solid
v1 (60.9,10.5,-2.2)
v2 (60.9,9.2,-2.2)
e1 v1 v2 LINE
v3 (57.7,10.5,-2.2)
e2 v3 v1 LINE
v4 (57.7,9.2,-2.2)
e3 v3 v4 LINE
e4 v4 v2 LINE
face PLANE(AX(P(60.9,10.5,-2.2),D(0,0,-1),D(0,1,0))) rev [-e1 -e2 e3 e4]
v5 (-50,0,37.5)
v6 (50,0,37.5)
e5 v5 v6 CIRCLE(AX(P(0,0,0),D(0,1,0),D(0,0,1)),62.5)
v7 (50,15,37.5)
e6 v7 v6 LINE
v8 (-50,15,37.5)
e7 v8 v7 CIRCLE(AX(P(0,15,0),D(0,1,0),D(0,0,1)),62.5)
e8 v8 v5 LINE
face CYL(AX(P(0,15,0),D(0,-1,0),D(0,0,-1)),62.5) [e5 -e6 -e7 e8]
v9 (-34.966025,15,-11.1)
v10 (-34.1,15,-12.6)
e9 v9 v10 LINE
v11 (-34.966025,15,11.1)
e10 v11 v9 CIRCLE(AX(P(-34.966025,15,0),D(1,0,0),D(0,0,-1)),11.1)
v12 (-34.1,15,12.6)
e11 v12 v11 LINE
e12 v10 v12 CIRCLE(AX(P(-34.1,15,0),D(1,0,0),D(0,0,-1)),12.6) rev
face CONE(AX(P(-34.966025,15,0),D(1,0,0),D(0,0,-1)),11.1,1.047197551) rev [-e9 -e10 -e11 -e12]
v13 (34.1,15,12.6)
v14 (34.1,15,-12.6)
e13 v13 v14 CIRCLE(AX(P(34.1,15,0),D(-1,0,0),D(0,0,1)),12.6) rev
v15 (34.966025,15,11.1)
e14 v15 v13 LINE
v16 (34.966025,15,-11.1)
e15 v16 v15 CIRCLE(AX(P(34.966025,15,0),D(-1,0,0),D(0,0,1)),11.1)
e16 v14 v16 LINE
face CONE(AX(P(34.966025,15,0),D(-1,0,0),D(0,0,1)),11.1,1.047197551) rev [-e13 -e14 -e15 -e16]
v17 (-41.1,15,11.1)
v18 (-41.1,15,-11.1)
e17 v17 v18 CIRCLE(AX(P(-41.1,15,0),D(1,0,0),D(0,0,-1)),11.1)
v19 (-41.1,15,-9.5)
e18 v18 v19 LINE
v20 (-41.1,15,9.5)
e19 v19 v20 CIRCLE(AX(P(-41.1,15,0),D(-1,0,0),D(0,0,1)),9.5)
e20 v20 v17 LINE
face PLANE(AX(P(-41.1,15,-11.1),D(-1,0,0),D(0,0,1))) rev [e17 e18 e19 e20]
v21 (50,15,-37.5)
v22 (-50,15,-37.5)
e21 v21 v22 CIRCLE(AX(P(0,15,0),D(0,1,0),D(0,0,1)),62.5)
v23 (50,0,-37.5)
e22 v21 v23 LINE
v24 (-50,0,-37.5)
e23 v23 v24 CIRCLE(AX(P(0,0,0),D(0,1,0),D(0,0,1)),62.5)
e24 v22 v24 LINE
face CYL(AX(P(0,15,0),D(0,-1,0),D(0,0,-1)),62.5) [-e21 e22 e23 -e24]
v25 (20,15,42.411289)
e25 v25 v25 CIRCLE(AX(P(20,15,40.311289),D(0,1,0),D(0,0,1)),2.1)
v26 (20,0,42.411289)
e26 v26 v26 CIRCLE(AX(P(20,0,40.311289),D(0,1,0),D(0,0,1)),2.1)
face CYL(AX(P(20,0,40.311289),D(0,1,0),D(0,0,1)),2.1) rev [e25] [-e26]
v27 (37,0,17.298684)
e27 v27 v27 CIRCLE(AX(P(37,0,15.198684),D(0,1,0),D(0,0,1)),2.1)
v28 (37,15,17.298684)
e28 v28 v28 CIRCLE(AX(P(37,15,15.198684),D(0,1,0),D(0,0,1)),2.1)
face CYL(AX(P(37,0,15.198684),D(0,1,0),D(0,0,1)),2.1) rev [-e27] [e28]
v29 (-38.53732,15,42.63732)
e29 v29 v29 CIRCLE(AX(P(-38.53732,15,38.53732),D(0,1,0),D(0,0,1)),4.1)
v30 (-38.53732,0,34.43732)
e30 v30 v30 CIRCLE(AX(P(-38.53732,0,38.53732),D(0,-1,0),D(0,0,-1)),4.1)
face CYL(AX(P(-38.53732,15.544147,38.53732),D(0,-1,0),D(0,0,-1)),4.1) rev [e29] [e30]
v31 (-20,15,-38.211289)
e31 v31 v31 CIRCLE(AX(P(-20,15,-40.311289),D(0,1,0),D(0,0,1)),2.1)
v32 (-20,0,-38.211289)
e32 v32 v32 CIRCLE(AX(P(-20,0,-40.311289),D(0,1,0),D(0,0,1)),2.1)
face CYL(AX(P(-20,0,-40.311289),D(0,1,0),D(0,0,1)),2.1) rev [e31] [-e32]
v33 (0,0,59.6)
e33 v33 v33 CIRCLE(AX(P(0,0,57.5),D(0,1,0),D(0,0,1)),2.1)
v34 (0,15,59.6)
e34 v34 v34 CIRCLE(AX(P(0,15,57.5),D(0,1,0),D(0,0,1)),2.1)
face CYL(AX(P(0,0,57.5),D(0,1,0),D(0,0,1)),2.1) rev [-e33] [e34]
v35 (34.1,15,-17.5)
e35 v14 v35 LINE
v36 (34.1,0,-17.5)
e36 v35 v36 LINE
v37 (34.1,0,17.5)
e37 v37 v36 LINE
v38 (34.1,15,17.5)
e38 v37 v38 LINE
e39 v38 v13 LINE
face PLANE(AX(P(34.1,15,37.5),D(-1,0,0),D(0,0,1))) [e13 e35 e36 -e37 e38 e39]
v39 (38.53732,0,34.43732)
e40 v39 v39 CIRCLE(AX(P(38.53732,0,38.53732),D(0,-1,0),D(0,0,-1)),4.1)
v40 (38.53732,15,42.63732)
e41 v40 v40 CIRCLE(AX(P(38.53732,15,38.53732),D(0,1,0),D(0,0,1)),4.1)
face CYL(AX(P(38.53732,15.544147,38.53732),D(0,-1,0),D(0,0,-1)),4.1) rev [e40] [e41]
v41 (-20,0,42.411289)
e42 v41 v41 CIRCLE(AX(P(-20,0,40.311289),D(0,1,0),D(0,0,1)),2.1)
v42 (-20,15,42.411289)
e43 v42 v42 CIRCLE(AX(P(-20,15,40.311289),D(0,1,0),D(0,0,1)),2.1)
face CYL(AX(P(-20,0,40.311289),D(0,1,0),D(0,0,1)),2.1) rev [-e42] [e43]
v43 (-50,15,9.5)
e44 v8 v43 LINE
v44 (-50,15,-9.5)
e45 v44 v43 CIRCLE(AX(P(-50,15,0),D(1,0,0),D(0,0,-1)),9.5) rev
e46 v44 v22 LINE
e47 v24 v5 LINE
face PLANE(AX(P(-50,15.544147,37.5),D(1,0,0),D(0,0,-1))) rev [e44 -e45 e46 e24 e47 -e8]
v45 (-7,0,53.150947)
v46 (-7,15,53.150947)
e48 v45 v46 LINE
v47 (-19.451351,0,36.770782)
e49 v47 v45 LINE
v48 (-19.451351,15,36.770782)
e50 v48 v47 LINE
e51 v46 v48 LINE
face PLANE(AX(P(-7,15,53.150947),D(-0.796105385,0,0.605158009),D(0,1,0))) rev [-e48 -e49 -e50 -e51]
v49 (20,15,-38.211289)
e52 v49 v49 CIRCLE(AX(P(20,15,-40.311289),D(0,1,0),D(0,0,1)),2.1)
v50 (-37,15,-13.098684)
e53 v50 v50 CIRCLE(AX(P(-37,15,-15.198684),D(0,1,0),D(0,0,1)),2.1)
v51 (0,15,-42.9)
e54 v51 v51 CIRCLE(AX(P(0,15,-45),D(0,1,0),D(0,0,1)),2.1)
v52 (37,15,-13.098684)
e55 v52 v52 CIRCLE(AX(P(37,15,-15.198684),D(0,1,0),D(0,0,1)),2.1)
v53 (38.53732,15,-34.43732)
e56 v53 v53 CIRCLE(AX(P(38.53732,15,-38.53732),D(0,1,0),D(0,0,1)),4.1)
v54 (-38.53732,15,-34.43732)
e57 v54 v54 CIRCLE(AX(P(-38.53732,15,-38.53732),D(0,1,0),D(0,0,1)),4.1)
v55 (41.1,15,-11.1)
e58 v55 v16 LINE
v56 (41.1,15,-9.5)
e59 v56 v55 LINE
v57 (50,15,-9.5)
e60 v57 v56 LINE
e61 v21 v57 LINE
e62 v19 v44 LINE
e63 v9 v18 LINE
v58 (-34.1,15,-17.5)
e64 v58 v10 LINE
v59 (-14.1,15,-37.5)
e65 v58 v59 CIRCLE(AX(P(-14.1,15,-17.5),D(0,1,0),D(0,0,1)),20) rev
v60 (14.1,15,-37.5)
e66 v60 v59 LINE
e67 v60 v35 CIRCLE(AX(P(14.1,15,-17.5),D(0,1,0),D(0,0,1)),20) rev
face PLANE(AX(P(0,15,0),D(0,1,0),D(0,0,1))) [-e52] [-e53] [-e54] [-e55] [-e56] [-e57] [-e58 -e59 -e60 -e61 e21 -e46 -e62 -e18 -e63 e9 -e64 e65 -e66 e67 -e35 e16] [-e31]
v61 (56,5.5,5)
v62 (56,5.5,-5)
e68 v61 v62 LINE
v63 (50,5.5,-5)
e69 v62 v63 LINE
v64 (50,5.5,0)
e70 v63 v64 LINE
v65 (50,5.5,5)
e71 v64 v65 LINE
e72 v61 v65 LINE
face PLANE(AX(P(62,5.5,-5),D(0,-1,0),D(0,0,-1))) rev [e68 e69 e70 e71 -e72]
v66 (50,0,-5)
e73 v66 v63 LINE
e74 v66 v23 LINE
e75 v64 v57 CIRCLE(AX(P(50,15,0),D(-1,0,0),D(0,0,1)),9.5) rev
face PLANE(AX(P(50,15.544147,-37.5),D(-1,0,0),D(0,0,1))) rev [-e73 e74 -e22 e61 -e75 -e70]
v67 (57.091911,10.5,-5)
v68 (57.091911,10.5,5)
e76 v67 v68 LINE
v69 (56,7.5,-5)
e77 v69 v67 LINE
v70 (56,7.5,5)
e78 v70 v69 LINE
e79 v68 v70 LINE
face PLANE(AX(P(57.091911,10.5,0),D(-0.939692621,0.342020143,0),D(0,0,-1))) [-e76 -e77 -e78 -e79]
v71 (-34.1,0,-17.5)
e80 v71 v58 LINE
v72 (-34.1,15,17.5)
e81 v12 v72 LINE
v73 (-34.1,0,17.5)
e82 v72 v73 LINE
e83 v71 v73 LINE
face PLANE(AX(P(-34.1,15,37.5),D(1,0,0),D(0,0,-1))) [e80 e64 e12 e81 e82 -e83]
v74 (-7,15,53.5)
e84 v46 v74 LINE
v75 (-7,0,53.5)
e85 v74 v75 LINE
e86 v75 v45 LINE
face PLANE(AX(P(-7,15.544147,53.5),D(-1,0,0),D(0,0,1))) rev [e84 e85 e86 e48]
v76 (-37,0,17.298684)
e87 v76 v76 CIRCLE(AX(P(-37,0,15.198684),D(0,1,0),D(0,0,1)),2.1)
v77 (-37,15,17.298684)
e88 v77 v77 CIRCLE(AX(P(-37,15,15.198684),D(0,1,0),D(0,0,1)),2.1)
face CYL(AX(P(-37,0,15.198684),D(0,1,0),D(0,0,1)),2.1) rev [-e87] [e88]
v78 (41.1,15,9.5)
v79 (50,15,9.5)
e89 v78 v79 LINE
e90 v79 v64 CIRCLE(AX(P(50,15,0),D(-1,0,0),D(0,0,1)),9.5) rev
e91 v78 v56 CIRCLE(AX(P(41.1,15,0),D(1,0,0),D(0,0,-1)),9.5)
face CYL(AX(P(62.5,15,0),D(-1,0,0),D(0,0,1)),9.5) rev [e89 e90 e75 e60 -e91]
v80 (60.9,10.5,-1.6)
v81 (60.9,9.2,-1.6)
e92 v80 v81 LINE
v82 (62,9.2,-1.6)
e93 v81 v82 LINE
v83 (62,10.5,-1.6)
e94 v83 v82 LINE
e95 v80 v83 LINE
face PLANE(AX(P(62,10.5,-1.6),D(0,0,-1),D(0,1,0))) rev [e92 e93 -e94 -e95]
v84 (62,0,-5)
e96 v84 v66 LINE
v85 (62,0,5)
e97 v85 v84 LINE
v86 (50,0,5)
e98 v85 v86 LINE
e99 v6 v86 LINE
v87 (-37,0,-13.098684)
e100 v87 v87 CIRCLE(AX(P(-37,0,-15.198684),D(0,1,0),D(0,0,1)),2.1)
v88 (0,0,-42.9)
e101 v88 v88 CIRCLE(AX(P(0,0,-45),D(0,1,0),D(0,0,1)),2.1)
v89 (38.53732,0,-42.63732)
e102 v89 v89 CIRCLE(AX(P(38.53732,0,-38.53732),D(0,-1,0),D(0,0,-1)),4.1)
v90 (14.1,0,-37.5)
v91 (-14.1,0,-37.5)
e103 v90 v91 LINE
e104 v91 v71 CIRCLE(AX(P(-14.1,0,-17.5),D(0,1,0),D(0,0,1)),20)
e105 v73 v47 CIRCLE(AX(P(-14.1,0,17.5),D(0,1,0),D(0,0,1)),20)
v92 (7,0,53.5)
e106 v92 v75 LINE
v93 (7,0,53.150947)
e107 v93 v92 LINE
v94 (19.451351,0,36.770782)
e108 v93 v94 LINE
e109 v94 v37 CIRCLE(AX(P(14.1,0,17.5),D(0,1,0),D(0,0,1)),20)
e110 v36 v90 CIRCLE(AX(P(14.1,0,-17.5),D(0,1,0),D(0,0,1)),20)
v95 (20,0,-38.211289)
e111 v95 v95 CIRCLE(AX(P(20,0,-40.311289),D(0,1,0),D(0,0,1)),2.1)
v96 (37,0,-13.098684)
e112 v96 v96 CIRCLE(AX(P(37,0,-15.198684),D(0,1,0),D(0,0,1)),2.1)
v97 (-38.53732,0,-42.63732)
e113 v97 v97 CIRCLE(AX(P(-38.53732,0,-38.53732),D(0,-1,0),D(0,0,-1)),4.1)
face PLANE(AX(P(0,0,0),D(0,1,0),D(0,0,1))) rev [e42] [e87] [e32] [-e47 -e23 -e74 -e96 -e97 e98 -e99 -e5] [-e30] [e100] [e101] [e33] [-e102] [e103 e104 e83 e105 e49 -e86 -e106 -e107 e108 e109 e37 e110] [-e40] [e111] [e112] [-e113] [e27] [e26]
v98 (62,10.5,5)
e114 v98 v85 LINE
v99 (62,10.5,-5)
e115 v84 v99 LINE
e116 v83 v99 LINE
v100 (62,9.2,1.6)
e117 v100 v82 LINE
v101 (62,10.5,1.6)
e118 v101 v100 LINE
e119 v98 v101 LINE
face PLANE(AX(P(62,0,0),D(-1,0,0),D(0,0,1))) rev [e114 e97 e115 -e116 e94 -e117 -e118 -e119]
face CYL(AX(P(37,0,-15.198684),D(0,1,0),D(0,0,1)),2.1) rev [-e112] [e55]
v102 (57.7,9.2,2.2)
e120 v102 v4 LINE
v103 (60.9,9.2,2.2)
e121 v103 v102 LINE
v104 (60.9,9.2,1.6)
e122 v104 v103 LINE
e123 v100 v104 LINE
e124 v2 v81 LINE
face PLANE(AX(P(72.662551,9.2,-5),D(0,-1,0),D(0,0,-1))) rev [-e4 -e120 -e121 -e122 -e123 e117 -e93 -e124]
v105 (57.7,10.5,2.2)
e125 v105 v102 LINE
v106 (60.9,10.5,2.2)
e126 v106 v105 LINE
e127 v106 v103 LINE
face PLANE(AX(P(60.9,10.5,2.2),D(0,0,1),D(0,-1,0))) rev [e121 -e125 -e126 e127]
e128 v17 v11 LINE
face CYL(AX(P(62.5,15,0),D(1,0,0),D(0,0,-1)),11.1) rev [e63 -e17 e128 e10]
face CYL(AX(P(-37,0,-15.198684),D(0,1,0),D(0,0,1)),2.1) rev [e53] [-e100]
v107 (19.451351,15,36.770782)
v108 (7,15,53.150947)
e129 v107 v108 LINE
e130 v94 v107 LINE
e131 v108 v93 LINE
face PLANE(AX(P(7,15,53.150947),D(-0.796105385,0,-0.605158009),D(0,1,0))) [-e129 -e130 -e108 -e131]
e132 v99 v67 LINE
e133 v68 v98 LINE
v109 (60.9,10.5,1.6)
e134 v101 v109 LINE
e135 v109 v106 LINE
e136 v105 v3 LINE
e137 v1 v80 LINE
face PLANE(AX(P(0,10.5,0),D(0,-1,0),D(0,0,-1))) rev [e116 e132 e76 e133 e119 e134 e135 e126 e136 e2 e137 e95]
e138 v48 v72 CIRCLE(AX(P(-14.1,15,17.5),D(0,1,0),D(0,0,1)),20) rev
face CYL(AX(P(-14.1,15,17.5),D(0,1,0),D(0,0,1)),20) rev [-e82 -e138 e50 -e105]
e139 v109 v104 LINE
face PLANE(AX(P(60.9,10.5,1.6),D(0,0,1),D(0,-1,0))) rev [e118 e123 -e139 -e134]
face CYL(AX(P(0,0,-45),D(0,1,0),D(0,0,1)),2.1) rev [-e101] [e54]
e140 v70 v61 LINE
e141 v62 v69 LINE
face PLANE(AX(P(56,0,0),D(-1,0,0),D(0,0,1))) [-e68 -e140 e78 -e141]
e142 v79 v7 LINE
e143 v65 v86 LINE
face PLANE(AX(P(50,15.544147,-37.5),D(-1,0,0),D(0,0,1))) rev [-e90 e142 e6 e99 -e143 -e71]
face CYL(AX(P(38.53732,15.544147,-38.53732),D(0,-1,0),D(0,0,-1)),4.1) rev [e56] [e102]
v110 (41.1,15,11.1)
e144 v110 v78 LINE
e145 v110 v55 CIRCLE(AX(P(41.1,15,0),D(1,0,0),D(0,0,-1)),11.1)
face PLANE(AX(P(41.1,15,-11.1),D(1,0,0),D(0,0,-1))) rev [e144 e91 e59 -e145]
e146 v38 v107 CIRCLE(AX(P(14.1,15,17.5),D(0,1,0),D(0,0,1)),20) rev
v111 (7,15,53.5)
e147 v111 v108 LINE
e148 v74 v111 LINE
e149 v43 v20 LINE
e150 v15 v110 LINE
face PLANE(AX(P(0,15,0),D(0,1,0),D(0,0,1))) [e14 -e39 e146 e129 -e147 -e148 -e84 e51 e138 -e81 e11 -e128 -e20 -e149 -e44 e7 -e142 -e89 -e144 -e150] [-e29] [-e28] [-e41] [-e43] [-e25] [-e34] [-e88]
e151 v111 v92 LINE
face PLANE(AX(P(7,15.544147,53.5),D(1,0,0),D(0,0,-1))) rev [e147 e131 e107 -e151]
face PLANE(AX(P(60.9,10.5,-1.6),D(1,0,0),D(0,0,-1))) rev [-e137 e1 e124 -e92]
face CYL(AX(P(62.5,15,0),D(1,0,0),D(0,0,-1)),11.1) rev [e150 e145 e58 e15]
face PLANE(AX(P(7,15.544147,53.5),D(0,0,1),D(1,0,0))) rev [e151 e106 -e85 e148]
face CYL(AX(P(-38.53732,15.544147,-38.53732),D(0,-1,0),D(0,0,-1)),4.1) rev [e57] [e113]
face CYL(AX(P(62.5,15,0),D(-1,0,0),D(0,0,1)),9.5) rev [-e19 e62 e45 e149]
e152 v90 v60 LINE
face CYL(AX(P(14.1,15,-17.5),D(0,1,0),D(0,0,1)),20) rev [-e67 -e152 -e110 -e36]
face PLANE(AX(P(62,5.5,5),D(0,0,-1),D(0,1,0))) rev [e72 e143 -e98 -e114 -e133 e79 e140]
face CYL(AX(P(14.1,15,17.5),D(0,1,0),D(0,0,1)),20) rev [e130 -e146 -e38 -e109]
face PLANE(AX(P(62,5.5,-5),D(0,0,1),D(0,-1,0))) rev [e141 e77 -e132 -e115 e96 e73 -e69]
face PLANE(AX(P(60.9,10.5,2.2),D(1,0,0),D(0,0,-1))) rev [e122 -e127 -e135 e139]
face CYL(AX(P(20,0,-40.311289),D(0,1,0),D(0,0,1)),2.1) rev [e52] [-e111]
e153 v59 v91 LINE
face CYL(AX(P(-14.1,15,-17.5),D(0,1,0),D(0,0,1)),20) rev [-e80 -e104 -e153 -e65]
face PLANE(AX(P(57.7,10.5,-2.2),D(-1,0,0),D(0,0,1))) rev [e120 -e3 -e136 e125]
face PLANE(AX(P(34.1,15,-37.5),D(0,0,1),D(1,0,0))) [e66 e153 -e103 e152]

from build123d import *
from OCP.BRepFilletAPI import BRepFilletAPI_MakeChamfer

# Parameters (mm, degrees)
SKETCH2_R               = 62.5
SKETCH2_W               = 68.2
SKETCH2_H               = 75
BOSS_EXTRUDE1_DEPTH     = 15
SKETCH7_W               = 7
SKETCH7_H               = 11.1
CUT_EXTRUDE1_DEPTH      = 122.918866465
CUT_EXTRUDE1_DEPTH_BACK = 122.918866465
SKETCH8_R               = 9.5
FILLET1_R               = 20
SKETCH9_R               = 2.1
CUT_EXTRUDE2_DEPTH      = 90.652105542
CHAMFER1_SIZE           = 1.5
CHAMFER1_SIZE2          = 0.866025404
SKETCH10_R              = 4.1
CUT_EXTRUDE3_DEPTH      = 90.652105542
CUT_EXTRUDE4_DEPTH      = 90.652105542
SKETCH12_W              = 10
SKETCH12_H              = 5.5
BOSS_EXTRUDE2_DEPTH     = 12
BOSS_EXTRUDE3_START     = 6
SKETCH14_W              = 10
SKETCH14_H              = 3.7
BOSS_EXTRUDE3_DEPTH     = 6
BOSS_EXTRUDE4_DEPTH     = 1.3
CHAMFER2_SIZE           = 3
CHAMFER2_SIZE2          = 1.091910703
SKETCH16_W              = 14
SKETCH16_H              = 16
CUT_EXTRUDE5_DEPTH      = 90.652105542
CHAMFER3_DEPTH          = 15
CUT_EXTRUDE6_DEPTH      = 90.652105542


with BuildPart() as part:
    # Sketch2 → Boss-Extrude1 (new body)
    with BuildSketch(Plane(origin=(0, 0, 0), x_dir=(1, 0, 0), z_dir=(0, 1, 0))):
        with Locations(Location((0, 0, 0), (0, 0, 270))):
            Circle(SKETCH2_R)
        Rectangle(SKETCH2_W, SKETCH2_H, mode=Mode.SUBTRACT)
    extrude(amount=BOSS_EXTRUDE1_DEPTH)

    # Sketch7 → Cut-Revolve2 (revolve, cut)
    with BuildSketch(Plane(origin=(0, 15, 0), x_dir=(1, 0, 0), z_dir=(0, 1, 0))):
        with Locations((-37.6, 5.55)):
            Rectangle(SKETCH7_W, SKETCH7_H)
        with Locations((37.6, 5.55)):
            Rectangle(SKETCH7_W, SKETCH7_H)
    revolve(axis=Axis((62.5, 15, 0), (-1, 0, 0)), mode=Mode.SUBTRACT)

    # Sketch8 → Cut-Extrude1 (cut, two sides: drawn at the far end of the back side and taken through both)
    with BuildSketch(Plane.ZY.offset(-41.1).offset(-CUT_EXTRUDE1_DEPTH_BACK)):
        with Locations((0, 15)):
            Circle(SKETCH8_R)
    extrude(amount=CUT_EXTRUDE1_DEPTH + CUT_EXTRUDE1_DEPTH_BACK, mode=Mode.SUBTRACT)

    # Fillet1
    fillet1_edges = [part.edges().sort_by_distance(p)[0] for p in [
        (-34.1, 7.5, -37.5),
        (-34.1, 7.5, 37.5),
        (34.1, 7.5, 37.5),
        (34.1, 7.5, -37.5),
    ]]
    fillet(fillet1_edges, radius=FILLET1_R)

    # Sketch9 → Cut-Extrude2 (cut, through all)
    with BuildSketch(Plane(origin=(0, 15, 0), x_dir=(1, 0, 0), z_dir=(0, 1, 0))):
        with Locations(Location((-37, 15.198684154, 0), (0, 0, 270))):
            Circle(SKETCH9_R)
        with Locations(Location((37, 15.198684154, 0), (0, 0, 270))):
            Circle(SKETCH9_R)
        with Locations(Location((37, -15.198684154, 0), (0, 0, 270))):
            Circle(SKETCH9_R)
        with Locations(Location((-37, -15.198684154, 0), (0, 0, 270))):
            Circle(SKETCH9_R)
        with Locations(Location((-20, 40.311288741, 0), (0, 0, 270))):
            Circle(SKETCH9_R)
        with Locations(Location((20, 40.311288741, 0), (0, 0, 270))):
            Circle(SKETCH9_R)
        with Locations(Location((20, -40.311288741, 0), (0, 0, 270))):
            Circle(SKETCH9_R)
        with Locations(Location((-20, -40.311288741, 0), (0, 0, 270))):
            Circle(SKETCH9_R)
        with Locations(Location((0, 45, 0), (0, 0, 270))):
            Circle(SKETCH9_R)
        with Locations(Location((0, -57.5, 0), (0, 0, 270))):
            Circle(SKETCH9_R)
    extrude(amount=-CUT_EXTRUDE2_DEPTH, mode=Mode.SUBTRACT)

    # Chamfer1: one chamfer whose edges measure the first distance from different faces: ONE call of the kernel's chamfer builder (chamfer() names one face for all edges)
    chamfer1_edges_1 = [part.edges().sort_by_distance(p)[0] for p in [
        (-34.1, 3.9, 0),
    ]]
    chamfer1_side_1 = [part.faces().sort_by_distance(p)[0] for p in [
        (-34.1, 0.380788655, 0),
    ]]
    chamfer1_edges_2 = [part.edges().sort_by_distance(p)[0] for p in [
        (34.1, 3.9, 0),
    ]]
    chamfer1_side_2 = [part.faces().sort_by_distance(p)[0] for p in [
        (34.1, 0.380788655, 0),
    ]]
    chamfer1 = BRepFilletAPI_MakeChamfer(part.part.solid().wrapped)
    for e in chamfer1_edges_1:
        chamfer1.Add(CHAMFER1_SIZE, CHAMFER1_SIZE2, e.wrapped, chamfer1_side_1[0].wrapped)  # the first distance lies on this face
    for e in chamfer1_edges_2:
        chamfer1.Add(CHAMFER1_SIZE, CHAMFER1_SIZE2, e.wrapped, chamfer1_side_2[0].wrapped)  # the first distance lies on this face
    add(Compound.cast(chamfer1.Shape()), mode=Mode.REPLACE)

    # Sketch10 → Cut-Extrude3 (cut, through all)
    with BuildSketch(Plane.XZ):
        with Locations(Location((38.537319575, -38.537319575, 0), (0, 0, 270))):
            Circle(SKETCH10_R)
        with Locations(Location((-38.537319575, -38.537319575, 0), (0, 0, 270))):
            Circle(SKETCH10_R)
        with Locations(Location((-38.537319575, 38.537319575, 0), (0, 0, 270))):
            Circle(SKETCH10_R)
        with Locations(Location((38.537319575, 38.537319575, 0), (0, 0, 270))):
            Circle(SKETCH10_R)
    extrude(amount=-CUT_EXTRUDE3_DEPTH, mode=Mode.SUBTRACT)

    # Sketch11 → Cut-Extrude4 (cut, through all)
    with BuildSketch(Plane.XZ):
        with BuildLine():
            Line((50, -37.5), (50, 37.5))
            ThreePointArc((50, 37.5), (62.5, 0), (50, -37.5))
        make_face()
    extrude(amount=-CUT_EXTRUDE4_DEPTH, mode=Mode.SUBTRACT)

    # Sketch12 → Boss-Extrude2 (add)
    with BuildSketch(Plane(origin=(50, 0, 0), x_dir=(0, 0, -1), z_dir=(1, 0, 0))):
        with Locations((0, 2.75)):
            Rectangle(SKETCH12_W, SKETCH12_H)
    extrude(amount=BOSS_EXTRUDE2_DEPTH)

    # Sketch14 → Boss-Extrude3 (add)
    with BuildSketch(Plane(origin=(50, 0, 0), x_dir=(0, 0, -1), z_dir=(1, 0, 0)).offset(BOSS_EXTRUDE3_START)):
        with Locations((0, 7.35)):
            Rectangle(SKETCH14_W, SKETCH14_H)
    extrude(amount=BOSS_EXTRUDE3_DEPTH)

    # Sketch15 → Boss-Extrude4 (add)
    with BuildSketch(Plane(origin=(0, 9.2, 0), x_dir=(1, 0, 0), z_dir=(0, 1, 0))):
        Polygon((60.9, -2.2), (60.9, -1.6), (62, -1.6), (62, -5), (56, -5), (56, 5), (62, 5), (62, 1.6), (60.9, 1.6), (60.9, 2.2), (57.7, 2.2), (57.7, -2.2), align=None)
    extrude(amount=BOSS_EXTRUDE4_DEPTH)

    # Chamfer2
    chamfer2_edges = [part.edges().sort_by_distance(p)[0] for p in [
        (56, 10.5, 0),
    ]]
    chamfer2_side = [part.faces().sort_by_distance(p)[0] for p in [
        (56, 8, 0),
    ]]
    chamfer(chamfer2_edges, length=CHAMFER2_SIZE, length2=CHAMFER2_SIZE2, reference=chamfer2_side[0])

    # Sketch16 → Cut-Extrude5 (cut, through all)
    with BuildSketch(Plane.XZ):
        with Locations((0, 45.5)):
            Rectangle(SKETCH16_W, SKETCH16_H)
    extrude(amount=-CUT_EXTRUDE5_DEPTH, mode=Mode.SUBTRACT)

    # Chamfer3: read off the stored shape, not the designer's step
    # Chamfer3 outline → Chamfer3 (cut)
    with BuildSketch(Plane(origin=(0, 0, 0), x_dir=(1, 0, 0), z_dir=(0, 1, 0))):
        with BuildLine():
            Line((7, -53.150946691), (19.451351351, -36.770781996))
            ThreePointArc((19.451351351, -36.770781996), (16.800403682, -37.316856965), (14.1, -37.5))
            Line((14.1, -37.5), (7, -37.5))
            Line((7, -37.5), (7, -53.150946691))
        make_face()
        with BuildLine():
            ThreePointArc((-14.1, -37.5), (-16.800403682, -37.316856965), (-19.451351351, -36.770781996))
            Line((-19.451351351, -36.770781996), (-7, -53.150946691))
            Line((-7, -53.150946691), (-7, -37.5))
            Line((-7, -37.5), (-14.1, -37.5))
        make_face()
    extrude(amount=CHAMFER3_DEPTH, mode=Mode.SUBTRACT)

    # Sketch18 → Cut-Extrude6 (cut, through all)
    with BuildSketch(Plane.XZ):
        with BuildLine():
            Line((-50, 37.5), (-50, -37.5))
            ThreePointArc((-50, -37.5), (-62.5, 0), (-50, 37.5))
        make_face()
    extrude(amount=-CUT_EXTRUDE6_DEPTH, mode=Mode.SUBTRACT)


solid = part.part
